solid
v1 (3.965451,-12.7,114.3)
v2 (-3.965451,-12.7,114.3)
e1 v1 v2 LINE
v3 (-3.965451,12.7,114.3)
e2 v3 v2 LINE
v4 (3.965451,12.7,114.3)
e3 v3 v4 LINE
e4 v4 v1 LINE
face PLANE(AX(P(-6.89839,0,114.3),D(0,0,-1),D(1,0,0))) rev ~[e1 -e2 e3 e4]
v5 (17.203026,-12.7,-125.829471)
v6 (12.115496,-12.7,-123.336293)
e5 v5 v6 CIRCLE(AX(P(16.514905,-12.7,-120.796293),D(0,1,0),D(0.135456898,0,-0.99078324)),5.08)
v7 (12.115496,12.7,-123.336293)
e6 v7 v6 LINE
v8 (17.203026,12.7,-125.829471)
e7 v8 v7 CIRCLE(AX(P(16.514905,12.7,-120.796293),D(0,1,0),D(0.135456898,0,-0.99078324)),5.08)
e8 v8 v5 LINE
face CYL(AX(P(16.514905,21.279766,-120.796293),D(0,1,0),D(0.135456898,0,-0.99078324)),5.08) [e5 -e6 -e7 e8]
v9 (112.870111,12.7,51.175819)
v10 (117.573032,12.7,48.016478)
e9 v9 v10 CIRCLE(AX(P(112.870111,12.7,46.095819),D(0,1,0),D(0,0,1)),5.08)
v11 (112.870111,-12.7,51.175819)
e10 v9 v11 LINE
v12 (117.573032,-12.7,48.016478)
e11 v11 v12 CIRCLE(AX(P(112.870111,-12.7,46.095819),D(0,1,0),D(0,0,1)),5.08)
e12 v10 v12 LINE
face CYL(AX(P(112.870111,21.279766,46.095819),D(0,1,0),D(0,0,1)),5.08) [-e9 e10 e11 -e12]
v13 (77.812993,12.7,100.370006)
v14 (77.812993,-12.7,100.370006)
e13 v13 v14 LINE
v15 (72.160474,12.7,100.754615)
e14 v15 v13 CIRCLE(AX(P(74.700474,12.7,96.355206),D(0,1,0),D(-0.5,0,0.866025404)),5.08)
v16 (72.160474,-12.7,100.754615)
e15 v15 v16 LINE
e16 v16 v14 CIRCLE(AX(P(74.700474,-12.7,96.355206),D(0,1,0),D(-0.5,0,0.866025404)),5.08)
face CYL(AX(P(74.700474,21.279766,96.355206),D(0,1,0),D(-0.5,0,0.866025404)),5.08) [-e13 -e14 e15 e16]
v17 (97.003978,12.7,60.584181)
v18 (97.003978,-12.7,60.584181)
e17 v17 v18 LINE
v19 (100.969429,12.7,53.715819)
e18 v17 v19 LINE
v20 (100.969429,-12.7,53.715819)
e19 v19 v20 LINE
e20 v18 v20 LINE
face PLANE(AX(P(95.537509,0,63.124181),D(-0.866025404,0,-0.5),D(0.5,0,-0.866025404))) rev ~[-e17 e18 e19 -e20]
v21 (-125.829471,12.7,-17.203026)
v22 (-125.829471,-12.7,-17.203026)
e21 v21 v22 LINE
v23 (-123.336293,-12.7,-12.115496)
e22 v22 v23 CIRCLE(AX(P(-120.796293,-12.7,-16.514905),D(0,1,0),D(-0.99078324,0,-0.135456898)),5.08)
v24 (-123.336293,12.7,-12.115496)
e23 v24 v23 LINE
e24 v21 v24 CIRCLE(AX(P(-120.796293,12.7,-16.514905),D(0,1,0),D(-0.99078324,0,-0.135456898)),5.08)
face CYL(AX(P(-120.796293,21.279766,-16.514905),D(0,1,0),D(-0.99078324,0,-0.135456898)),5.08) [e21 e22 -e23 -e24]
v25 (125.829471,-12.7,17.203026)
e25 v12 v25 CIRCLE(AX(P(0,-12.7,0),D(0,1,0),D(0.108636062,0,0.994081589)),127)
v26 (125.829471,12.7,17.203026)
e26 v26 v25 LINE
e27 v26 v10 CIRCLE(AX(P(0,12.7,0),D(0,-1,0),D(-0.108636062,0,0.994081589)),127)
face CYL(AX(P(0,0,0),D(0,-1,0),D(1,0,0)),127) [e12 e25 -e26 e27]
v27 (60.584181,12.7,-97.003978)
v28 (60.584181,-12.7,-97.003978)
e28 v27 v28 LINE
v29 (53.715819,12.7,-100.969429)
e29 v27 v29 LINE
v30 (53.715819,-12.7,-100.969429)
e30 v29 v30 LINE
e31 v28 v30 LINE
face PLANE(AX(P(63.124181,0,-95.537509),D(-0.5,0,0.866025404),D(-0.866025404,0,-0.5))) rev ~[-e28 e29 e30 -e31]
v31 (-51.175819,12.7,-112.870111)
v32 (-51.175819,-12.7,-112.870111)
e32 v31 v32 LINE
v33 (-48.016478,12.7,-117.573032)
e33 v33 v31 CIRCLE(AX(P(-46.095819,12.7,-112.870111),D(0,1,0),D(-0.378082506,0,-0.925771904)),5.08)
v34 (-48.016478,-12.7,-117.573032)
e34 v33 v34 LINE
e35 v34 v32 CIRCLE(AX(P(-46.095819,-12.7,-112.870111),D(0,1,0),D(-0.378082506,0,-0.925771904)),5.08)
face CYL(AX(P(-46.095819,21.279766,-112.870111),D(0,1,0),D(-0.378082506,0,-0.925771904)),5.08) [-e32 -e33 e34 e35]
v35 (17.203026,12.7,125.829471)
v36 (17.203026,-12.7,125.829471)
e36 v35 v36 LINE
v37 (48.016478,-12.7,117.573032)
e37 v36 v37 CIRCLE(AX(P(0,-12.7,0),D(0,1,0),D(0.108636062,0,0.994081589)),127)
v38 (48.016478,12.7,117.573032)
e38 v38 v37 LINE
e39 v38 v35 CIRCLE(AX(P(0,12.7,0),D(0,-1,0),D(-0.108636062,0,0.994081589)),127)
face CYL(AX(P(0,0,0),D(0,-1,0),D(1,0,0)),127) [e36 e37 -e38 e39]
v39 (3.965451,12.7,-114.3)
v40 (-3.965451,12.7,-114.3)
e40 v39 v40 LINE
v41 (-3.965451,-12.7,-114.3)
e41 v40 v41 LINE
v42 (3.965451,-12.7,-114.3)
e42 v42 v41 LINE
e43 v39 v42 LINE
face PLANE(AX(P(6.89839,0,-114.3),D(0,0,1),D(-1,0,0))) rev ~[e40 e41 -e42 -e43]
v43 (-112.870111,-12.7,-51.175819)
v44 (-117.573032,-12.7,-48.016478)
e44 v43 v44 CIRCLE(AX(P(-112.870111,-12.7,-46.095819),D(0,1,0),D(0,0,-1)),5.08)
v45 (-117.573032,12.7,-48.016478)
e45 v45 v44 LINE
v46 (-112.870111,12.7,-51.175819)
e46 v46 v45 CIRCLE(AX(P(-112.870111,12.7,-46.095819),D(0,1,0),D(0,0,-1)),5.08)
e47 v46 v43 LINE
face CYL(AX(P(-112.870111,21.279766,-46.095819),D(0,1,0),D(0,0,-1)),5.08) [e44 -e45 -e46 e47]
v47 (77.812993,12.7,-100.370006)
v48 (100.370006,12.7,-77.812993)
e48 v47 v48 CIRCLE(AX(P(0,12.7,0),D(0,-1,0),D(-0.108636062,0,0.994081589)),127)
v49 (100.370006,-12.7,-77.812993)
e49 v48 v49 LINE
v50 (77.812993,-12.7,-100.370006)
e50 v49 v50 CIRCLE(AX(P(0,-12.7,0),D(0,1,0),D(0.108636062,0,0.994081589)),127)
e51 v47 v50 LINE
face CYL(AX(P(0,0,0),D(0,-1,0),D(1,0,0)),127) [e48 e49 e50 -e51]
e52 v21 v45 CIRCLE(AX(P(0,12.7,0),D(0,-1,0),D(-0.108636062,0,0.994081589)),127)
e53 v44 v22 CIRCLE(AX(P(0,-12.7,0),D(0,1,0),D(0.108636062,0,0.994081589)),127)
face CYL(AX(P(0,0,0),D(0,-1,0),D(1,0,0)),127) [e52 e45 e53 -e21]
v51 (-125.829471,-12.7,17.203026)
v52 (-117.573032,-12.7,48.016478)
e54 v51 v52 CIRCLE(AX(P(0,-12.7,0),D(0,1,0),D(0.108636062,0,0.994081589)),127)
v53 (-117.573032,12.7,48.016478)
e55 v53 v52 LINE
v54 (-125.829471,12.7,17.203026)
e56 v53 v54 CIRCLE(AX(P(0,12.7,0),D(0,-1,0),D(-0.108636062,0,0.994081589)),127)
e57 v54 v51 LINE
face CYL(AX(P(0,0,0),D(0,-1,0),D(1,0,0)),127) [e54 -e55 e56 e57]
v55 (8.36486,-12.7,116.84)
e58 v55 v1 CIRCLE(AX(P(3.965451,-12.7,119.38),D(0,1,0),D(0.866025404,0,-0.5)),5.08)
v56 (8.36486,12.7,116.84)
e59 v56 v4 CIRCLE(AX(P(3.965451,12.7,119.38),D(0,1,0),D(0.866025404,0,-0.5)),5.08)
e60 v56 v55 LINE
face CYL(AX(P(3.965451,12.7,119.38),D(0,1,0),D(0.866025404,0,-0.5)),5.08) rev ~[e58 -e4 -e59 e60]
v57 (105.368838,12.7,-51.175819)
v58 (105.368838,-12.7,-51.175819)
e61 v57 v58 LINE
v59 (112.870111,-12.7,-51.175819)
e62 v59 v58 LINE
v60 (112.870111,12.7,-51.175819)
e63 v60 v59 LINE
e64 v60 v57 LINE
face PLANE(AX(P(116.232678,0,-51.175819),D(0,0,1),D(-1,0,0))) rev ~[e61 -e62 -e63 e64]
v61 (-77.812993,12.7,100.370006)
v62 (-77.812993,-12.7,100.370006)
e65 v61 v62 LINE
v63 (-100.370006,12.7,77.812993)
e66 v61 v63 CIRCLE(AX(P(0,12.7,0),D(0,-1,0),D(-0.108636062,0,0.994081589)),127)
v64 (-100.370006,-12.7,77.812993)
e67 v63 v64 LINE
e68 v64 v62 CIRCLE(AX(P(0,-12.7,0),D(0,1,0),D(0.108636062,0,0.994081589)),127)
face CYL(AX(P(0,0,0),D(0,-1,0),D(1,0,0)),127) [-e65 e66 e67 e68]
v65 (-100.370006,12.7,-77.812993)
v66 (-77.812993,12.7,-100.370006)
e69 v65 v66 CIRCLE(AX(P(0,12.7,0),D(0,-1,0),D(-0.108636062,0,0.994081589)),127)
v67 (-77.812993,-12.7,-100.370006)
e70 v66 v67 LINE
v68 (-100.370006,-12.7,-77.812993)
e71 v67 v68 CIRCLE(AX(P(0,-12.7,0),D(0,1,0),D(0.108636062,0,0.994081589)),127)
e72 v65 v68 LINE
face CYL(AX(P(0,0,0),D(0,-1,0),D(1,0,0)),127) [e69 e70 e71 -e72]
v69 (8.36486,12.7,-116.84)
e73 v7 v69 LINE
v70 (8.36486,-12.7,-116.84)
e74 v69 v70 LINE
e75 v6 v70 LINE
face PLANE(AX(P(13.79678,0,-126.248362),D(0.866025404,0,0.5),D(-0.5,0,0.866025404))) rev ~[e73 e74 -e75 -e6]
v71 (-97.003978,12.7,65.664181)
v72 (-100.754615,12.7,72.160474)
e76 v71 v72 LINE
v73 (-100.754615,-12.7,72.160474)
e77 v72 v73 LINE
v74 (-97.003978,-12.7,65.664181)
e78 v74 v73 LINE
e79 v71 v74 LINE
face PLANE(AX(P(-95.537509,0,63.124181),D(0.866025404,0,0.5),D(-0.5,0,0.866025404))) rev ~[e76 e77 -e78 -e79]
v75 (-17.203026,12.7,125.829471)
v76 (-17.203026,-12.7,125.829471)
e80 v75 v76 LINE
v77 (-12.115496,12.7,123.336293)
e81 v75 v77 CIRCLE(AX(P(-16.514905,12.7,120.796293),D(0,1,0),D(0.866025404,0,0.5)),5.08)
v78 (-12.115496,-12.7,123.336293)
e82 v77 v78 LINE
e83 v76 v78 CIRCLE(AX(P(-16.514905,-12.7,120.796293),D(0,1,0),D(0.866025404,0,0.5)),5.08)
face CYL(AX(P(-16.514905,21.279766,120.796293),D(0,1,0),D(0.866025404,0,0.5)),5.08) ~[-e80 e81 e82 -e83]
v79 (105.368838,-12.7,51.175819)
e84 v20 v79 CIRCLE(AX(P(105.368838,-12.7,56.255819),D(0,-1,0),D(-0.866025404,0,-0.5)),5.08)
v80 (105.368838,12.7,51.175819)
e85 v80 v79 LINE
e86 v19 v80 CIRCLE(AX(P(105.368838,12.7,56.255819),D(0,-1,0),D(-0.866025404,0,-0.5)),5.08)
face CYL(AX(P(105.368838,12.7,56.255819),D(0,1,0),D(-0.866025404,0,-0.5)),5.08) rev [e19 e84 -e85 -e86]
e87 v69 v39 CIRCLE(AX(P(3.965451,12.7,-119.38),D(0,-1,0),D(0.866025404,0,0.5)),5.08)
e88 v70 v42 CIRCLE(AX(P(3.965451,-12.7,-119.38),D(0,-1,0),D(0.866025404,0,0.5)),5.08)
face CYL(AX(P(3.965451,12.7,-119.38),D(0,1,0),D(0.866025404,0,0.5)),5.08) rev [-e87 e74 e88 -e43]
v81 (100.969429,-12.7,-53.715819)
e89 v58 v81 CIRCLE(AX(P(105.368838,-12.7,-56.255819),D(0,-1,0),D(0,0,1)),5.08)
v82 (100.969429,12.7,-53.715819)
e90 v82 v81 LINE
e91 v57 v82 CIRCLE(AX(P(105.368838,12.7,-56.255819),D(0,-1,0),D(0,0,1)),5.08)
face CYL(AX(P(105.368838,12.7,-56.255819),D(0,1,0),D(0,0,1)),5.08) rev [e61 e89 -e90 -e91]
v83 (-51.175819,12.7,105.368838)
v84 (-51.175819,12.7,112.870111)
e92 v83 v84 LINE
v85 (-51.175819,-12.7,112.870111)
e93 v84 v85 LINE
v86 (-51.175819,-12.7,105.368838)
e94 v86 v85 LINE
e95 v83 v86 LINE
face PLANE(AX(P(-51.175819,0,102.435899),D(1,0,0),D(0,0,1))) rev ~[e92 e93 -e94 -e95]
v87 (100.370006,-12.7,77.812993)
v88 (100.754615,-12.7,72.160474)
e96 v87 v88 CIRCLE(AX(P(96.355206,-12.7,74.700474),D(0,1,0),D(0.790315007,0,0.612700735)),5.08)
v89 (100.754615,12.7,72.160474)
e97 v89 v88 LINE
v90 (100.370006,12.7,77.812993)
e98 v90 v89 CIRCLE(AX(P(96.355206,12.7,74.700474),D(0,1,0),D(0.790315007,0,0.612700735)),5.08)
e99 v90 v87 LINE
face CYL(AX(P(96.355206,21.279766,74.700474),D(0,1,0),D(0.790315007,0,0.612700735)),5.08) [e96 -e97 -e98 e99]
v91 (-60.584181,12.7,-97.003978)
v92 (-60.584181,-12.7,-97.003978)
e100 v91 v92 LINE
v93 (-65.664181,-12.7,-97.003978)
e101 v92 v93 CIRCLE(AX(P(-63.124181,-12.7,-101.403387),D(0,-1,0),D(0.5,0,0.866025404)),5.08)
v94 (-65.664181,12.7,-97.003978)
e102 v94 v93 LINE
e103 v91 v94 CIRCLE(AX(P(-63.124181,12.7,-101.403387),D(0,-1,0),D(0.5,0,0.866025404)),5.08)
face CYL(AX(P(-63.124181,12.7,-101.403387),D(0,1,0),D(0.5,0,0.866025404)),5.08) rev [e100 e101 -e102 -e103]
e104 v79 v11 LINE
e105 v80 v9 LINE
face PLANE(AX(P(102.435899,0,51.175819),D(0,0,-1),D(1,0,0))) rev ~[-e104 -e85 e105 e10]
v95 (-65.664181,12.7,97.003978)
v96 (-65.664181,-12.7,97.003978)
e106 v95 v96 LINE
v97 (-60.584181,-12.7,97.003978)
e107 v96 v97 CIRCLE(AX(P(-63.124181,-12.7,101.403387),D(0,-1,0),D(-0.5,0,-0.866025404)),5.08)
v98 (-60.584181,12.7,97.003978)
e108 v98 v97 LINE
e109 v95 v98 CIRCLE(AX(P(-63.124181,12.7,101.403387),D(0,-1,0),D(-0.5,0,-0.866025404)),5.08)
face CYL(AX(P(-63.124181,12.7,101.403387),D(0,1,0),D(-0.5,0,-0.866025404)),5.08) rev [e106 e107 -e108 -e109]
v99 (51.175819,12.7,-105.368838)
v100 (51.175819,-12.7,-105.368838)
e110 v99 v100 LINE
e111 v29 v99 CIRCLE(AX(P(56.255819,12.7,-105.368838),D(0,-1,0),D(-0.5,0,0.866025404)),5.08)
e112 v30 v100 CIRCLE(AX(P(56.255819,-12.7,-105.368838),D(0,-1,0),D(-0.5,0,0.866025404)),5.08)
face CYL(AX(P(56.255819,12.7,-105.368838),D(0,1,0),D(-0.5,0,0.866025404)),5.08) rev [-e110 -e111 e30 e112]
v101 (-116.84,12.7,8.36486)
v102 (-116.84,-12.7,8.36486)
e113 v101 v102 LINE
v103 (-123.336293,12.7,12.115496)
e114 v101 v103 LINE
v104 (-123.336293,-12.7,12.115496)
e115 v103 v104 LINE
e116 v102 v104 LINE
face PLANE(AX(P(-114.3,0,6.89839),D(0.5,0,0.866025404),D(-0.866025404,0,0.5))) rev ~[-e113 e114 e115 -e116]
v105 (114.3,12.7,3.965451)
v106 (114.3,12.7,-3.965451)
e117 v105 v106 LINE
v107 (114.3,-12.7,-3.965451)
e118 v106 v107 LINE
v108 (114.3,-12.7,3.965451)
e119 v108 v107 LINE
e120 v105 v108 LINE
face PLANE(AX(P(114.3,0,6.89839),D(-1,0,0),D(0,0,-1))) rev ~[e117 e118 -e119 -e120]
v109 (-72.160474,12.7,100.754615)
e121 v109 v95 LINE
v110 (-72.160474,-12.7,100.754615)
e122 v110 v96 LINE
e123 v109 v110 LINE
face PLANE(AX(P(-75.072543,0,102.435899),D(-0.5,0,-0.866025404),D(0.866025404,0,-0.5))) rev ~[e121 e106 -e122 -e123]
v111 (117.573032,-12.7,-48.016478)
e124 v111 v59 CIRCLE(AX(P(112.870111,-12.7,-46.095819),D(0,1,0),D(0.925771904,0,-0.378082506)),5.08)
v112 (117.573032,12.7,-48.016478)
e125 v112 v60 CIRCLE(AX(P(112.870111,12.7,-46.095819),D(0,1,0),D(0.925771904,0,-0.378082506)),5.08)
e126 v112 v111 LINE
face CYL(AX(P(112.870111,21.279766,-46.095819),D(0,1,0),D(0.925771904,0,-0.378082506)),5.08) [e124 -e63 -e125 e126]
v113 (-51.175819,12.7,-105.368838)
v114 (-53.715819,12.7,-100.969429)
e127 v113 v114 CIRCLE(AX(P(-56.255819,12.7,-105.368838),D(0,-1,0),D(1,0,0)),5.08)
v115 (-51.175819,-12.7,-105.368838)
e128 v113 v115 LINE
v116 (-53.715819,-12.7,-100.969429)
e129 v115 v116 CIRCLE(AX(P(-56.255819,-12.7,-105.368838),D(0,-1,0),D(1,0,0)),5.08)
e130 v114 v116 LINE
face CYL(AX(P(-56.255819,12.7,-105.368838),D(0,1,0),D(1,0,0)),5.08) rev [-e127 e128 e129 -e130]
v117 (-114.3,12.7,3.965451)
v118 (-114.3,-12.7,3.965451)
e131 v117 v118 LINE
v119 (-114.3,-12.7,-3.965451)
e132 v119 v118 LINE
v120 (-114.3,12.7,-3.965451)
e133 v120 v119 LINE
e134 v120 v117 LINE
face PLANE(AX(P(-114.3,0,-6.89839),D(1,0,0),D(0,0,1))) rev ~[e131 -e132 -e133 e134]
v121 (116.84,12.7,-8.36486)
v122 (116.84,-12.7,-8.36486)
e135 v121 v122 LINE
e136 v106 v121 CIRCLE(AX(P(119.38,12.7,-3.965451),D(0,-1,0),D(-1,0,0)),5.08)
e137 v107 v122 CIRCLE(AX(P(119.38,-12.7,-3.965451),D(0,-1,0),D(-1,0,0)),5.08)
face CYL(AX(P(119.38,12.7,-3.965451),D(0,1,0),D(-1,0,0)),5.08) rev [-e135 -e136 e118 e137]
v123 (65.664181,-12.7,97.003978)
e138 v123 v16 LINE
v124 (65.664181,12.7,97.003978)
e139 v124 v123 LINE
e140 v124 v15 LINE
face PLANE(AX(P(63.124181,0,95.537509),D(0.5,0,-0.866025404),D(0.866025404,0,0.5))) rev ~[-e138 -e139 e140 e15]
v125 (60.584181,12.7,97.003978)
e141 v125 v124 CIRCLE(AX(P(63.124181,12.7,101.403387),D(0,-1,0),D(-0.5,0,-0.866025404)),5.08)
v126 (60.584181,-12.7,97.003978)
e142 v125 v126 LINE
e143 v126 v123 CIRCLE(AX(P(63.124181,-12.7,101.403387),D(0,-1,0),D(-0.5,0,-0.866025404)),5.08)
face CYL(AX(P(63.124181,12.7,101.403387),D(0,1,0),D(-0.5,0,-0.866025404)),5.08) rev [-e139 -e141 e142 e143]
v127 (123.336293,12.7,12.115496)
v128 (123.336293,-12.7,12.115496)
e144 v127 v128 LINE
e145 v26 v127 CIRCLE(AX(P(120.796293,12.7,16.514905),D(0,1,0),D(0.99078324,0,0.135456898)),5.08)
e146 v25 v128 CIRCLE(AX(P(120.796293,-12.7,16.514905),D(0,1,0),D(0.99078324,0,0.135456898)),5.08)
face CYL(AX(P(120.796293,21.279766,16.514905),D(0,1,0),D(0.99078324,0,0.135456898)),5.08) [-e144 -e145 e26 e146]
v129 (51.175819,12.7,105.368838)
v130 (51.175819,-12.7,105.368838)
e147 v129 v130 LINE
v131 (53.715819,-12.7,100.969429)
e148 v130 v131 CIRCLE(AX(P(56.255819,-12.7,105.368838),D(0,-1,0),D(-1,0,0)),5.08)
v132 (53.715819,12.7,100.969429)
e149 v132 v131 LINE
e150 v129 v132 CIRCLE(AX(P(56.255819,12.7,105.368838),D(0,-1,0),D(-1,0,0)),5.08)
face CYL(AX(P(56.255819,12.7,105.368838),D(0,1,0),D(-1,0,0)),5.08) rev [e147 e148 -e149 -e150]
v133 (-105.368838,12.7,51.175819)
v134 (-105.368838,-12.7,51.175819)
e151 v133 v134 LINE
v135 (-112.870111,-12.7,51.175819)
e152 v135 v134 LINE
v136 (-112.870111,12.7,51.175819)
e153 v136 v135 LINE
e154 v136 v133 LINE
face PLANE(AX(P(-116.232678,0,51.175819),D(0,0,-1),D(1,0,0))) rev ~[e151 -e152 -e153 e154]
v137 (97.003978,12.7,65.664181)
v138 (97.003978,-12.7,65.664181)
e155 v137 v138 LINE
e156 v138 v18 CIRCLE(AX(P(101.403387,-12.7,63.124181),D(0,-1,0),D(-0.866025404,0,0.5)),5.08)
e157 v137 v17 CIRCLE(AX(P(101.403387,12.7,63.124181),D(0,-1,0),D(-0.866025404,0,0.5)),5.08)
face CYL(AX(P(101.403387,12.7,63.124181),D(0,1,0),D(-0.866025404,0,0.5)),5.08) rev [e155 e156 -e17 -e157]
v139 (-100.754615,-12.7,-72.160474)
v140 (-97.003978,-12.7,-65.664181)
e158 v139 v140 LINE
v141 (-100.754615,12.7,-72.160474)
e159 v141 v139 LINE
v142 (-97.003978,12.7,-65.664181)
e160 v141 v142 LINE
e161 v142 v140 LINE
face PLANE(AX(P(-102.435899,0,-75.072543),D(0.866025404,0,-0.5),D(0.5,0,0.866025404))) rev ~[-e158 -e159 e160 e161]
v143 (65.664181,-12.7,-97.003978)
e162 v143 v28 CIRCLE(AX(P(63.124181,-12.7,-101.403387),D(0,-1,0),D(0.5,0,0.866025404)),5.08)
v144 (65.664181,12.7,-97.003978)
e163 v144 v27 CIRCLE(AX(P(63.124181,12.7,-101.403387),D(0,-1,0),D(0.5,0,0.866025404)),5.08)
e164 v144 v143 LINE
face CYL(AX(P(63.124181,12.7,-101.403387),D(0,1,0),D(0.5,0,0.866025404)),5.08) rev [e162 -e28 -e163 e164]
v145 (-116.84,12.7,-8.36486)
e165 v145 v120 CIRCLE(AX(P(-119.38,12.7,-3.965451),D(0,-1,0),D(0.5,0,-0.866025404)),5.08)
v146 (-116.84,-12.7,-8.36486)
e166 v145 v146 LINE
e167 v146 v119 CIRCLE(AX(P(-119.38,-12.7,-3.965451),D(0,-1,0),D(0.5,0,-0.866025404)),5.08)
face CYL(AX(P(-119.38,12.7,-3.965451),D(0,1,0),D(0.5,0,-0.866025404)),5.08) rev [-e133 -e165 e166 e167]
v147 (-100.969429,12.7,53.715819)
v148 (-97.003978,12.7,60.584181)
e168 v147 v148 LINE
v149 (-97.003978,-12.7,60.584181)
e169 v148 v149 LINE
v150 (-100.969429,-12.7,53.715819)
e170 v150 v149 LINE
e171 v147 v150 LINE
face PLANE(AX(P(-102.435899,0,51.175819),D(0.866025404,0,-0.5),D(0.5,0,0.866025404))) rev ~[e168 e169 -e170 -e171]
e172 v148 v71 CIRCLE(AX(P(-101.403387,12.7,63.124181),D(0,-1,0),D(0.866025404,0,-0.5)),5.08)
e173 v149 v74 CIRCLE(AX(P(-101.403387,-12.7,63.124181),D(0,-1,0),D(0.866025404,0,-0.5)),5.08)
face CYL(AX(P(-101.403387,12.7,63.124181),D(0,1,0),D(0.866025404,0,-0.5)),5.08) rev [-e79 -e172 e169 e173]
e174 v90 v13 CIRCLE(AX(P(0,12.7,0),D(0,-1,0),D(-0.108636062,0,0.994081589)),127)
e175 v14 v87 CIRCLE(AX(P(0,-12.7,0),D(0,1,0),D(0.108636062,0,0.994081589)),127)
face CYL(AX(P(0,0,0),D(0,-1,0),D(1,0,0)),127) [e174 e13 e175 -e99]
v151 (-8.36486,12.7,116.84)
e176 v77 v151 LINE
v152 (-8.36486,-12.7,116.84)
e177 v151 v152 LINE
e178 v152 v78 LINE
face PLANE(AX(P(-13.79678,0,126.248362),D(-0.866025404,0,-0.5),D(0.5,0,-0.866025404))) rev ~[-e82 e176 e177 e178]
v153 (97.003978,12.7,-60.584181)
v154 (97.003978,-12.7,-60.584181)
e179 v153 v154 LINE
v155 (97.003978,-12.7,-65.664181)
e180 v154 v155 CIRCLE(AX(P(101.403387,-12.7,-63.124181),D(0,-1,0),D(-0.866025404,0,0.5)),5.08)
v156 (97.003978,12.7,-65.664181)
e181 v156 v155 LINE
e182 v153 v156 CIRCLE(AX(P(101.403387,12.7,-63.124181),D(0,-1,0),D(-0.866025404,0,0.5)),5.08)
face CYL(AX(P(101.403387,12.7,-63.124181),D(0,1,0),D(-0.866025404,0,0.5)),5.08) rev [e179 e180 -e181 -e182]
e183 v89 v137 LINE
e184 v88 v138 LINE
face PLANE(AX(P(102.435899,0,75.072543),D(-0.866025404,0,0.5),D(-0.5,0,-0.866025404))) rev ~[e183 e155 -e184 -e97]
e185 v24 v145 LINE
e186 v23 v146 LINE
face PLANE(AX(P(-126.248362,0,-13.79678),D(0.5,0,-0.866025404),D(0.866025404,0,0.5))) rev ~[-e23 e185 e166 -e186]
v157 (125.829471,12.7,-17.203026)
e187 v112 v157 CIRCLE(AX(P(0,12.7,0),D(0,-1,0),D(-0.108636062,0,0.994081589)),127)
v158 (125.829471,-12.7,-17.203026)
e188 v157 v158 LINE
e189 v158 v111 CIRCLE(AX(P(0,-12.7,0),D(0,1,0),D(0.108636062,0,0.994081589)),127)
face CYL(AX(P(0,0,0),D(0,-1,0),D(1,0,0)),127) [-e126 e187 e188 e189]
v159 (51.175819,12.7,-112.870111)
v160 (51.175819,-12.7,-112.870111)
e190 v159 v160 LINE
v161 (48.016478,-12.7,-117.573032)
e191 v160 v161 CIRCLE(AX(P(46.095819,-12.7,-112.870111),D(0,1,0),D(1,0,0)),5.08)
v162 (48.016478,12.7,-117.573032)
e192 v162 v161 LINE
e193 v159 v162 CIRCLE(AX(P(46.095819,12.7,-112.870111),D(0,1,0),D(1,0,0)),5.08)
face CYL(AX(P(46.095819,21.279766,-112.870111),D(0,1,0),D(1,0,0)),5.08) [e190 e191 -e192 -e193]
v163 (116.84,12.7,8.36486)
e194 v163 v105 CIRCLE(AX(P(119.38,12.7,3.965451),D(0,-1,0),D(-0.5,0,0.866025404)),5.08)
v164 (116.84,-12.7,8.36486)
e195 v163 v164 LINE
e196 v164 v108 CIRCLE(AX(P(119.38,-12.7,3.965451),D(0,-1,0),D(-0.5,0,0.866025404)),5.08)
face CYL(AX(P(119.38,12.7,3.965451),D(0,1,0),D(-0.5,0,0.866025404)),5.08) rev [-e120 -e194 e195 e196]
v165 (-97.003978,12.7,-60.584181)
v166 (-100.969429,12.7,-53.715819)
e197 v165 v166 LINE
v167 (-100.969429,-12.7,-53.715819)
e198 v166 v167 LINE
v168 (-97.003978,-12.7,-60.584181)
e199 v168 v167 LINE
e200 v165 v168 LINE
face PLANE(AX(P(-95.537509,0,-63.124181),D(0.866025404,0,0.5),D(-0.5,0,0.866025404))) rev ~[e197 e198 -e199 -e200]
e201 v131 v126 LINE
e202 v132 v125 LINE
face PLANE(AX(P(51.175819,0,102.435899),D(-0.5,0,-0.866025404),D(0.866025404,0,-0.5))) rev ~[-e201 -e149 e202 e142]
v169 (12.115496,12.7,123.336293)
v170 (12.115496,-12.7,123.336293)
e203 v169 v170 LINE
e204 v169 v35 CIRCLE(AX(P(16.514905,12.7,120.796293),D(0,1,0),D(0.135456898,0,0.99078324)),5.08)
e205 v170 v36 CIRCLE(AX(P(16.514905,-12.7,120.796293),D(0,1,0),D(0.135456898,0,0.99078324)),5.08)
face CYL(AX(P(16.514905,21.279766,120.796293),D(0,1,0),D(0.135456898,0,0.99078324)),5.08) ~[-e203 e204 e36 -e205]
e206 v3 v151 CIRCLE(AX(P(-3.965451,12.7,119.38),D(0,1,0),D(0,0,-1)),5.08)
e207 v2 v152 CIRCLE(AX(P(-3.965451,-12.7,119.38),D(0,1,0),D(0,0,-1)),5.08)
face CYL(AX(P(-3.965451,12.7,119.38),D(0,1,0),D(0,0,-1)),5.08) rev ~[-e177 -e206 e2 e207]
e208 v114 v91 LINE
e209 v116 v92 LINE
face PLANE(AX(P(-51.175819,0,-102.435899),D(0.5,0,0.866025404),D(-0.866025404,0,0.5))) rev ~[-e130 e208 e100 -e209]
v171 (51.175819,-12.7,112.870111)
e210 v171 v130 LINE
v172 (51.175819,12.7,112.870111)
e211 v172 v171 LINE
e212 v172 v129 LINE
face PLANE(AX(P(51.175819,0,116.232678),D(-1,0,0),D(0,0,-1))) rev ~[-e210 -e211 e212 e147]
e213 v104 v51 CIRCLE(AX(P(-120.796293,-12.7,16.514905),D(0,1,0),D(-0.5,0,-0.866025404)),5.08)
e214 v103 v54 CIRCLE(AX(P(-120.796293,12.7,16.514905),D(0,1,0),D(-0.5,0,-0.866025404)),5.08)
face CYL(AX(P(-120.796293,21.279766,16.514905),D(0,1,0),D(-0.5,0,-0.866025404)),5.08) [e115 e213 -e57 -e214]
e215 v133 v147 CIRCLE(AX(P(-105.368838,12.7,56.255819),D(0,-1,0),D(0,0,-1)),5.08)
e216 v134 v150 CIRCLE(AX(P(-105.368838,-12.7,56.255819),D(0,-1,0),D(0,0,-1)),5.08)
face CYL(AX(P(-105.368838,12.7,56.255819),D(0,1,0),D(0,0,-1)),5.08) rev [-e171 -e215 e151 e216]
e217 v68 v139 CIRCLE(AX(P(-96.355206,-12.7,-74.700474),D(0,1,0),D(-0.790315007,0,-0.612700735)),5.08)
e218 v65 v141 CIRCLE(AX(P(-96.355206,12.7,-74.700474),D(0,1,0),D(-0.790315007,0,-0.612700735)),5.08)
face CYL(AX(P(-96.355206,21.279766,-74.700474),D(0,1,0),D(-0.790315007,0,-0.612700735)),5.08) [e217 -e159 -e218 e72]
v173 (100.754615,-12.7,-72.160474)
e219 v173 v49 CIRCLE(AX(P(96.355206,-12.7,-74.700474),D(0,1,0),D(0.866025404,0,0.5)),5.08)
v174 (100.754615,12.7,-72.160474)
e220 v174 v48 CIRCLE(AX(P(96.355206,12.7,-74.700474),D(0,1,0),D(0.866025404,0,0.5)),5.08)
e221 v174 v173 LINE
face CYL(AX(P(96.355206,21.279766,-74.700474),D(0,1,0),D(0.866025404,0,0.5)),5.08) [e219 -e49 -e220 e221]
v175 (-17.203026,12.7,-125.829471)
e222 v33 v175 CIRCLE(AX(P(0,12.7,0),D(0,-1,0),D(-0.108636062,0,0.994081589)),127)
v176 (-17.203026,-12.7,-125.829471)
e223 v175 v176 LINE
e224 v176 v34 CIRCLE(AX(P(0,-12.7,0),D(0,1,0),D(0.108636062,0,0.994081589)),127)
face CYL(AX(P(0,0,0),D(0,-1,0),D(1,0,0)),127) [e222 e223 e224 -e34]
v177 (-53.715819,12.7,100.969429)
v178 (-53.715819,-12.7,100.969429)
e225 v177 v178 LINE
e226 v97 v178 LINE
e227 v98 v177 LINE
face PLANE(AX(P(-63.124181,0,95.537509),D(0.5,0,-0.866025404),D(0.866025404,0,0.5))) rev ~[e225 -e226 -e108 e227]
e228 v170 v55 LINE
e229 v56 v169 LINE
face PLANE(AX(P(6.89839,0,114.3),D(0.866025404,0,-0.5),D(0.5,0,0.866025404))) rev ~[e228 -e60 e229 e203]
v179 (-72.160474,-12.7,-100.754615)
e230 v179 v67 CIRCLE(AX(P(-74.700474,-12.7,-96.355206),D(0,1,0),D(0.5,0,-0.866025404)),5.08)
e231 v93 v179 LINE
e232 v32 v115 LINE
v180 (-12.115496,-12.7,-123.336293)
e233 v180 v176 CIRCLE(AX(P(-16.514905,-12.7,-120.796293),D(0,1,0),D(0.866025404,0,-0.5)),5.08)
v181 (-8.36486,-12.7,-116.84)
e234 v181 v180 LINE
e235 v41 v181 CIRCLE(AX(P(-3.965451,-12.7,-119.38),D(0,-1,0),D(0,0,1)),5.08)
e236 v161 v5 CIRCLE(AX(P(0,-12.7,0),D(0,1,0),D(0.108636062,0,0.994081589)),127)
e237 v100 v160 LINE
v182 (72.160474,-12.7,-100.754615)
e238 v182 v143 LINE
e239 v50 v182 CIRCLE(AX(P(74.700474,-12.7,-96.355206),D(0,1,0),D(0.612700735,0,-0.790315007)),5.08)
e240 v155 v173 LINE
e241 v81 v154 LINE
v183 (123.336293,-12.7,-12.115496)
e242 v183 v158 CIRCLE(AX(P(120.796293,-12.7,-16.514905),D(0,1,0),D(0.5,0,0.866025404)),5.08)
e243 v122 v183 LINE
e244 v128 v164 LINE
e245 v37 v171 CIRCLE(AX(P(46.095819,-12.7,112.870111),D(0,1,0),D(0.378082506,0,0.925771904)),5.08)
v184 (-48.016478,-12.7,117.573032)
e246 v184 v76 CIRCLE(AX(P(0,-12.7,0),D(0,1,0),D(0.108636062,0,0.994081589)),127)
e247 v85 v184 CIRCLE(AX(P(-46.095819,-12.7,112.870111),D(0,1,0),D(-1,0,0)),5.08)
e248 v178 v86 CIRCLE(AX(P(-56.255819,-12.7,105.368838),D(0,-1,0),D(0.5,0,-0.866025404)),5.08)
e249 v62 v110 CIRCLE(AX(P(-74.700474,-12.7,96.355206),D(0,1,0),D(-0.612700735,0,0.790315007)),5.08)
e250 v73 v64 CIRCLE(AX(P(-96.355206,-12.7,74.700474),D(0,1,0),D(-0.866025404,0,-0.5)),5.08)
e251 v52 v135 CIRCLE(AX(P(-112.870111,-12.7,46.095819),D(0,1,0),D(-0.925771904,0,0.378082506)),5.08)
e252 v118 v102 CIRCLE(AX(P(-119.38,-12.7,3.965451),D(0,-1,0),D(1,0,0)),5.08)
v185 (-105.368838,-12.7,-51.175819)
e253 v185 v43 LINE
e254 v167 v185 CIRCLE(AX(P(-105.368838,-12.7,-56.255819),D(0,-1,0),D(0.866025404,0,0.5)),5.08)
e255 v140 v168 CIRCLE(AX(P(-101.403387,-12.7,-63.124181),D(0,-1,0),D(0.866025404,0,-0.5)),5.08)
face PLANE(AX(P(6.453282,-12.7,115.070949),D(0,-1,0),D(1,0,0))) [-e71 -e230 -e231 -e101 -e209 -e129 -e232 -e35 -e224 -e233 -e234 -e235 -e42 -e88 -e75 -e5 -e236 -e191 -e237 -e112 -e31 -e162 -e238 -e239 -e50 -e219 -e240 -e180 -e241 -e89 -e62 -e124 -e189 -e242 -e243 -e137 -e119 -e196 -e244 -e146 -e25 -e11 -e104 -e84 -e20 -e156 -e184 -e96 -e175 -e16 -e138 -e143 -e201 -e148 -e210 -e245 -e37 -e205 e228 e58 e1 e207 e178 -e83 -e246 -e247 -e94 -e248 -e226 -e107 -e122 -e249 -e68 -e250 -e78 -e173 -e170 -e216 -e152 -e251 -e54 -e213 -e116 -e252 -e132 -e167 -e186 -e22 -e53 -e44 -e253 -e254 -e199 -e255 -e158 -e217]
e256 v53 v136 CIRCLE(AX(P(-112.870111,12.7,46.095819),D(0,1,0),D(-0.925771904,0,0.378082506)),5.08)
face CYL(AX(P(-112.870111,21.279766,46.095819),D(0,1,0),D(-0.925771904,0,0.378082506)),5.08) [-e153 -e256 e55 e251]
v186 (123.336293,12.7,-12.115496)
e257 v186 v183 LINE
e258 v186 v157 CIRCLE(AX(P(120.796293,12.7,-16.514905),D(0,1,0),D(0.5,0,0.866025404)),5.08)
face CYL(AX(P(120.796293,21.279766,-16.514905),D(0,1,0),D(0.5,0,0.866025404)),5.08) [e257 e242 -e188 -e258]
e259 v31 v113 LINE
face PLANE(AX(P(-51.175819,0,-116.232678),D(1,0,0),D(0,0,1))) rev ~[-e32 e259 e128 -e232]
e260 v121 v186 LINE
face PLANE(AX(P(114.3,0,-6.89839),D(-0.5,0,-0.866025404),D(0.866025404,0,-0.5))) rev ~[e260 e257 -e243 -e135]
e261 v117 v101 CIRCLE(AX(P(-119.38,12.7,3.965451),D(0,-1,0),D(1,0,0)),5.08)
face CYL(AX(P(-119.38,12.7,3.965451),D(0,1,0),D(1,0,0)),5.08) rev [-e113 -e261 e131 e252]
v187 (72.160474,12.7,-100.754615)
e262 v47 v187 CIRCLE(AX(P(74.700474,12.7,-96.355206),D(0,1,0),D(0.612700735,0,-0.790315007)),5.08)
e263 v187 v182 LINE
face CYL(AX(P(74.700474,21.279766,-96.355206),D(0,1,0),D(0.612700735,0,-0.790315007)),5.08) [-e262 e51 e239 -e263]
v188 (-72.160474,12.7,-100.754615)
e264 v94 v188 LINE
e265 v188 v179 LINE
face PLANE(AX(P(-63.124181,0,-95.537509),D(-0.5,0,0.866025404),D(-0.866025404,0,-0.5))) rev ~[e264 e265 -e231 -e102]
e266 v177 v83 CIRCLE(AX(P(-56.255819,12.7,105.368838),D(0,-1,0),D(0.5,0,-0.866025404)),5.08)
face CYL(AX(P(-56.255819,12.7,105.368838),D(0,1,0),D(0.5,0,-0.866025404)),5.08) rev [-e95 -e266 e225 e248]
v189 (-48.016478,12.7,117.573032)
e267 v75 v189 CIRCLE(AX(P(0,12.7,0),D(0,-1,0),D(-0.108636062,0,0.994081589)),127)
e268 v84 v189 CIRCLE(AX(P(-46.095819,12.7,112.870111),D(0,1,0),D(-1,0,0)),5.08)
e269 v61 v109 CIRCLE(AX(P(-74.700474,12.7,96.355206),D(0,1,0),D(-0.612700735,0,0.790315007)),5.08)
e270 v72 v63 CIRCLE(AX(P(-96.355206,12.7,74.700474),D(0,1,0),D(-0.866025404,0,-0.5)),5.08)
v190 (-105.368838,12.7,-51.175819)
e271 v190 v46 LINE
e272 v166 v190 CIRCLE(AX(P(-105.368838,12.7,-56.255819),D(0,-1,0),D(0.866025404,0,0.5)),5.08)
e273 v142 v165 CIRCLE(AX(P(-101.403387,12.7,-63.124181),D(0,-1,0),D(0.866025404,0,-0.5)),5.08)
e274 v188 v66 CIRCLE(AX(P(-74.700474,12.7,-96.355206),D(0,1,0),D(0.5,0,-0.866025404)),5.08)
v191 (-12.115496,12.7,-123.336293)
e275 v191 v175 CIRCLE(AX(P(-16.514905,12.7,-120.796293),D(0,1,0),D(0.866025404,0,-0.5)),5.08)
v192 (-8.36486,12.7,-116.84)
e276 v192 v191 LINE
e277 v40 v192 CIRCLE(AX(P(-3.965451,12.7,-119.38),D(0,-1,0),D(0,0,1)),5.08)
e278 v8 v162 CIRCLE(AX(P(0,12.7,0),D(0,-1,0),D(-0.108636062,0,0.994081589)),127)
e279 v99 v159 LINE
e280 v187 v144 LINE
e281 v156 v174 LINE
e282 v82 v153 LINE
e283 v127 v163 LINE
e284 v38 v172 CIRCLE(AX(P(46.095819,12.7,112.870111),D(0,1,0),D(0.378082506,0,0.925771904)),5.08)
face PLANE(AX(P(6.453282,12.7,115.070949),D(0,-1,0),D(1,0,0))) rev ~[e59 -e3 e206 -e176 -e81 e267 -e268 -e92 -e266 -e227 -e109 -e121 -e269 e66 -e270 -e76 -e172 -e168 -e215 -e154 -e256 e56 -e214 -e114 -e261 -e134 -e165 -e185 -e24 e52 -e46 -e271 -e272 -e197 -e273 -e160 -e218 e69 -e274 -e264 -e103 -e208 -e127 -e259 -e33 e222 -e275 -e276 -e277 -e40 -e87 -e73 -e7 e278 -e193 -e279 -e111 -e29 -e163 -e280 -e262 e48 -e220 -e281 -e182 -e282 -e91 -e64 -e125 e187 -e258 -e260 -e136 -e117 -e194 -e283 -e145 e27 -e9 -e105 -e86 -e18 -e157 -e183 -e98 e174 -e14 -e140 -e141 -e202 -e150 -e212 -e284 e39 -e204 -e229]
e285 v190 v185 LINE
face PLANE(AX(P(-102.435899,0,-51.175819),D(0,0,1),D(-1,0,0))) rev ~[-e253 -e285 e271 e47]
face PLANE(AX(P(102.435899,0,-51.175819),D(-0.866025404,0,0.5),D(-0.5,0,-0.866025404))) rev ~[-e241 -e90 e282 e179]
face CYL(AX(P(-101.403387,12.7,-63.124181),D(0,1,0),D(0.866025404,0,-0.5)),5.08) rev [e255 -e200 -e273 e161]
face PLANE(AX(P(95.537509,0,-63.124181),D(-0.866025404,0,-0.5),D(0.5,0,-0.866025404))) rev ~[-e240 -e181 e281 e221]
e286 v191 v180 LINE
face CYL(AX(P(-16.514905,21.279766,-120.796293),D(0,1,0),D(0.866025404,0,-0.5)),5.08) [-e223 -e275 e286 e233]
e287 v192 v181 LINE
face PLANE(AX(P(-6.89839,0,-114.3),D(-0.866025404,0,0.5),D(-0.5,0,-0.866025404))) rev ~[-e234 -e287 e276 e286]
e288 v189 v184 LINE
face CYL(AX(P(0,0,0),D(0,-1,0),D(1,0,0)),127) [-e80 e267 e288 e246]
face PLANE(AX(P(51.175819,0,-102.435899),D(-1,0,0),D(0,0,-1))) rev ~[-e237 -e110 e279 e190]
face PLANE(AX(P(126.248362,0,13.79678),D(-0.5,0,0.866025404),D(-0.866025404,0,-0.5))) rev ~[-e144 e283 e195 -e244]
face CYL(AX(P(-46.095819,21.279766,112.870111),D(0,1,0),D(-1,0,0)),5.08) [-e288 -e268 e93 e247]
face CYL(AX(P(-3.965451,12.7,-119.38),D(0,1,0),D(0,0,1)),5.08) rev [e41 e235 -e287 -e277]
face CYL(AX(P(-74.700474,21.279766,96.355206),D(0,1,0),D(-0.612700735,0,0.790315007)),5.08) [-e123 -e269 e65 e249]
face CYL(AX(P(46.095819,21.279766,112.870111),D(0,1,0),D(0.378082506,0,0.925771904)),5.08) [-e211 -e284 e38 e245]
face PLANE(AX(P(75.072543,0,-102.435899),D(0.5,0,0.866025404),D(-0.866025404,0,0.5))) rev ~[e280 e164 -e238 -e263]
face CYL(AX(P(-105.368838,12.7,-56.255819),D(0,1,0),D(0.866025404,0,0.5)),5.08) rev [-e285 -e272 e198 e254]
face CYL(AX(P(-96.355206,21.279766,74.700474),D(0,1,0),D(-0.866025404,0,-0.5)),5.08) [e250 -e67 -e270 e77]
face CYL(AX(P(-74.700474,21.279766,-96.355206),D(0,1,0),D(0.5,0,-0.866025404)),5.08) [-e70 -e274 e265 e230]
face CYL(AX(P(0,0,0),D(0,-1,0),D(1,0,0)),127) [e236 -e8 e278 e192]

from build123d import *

# Parameters (mm, degrees)
F0_R            = 127
F1_DEPTH        = 12.7
F3_DEPTH        = 12.701
F3_DEPTH_BACK   = 12.701
F3_COPIES_COUNT = 12
F4_T1_DEPTH     = 25.4
F4_T3_DEPTH     = 42.5595323233


# Not quite as in the source:
# - a fillet or chamfer that OpenCascade refuses, or shapes differently, is made with other operations: its cross-section is extruded or revolved along the edge and cut away or added
# - a feature of the source that left no trace in its solid (it failed there, or was rolled back) is left out
# - a pattern or mirror of a feature is missing from the dataset's text; its kind, count and spacing are read off the source's solid


with BuildPart() as f1:
    # F0 (on Front) → F1 (new body, symmetric)
    with BuildSketch(Plane.XZ):
        Circle(F0_R)
    extrude(amount=F1_DEPTH, both=True)

    # F2 (on Front) → F3 (cut, two sides)
    with BuildSketch(Plane.XZ) as f3_sk:
        with BuildLine():
            Line((0, 114.3), (6.8983899217, 114.3))
            Line((6.8983899217, 114.3), (13.7967798433, 126.2483618347))
            ThreePointArc((13.7967798433, 126.2483618347), (0, 127), (-13.7967798433, 126.2483618347))
            Line((-13.7967798433, 126.2483618347), (-6.8983899217, 114.3))
            Line((-6.8983899217, 114.3), (0, 114.3))
        make_face()
    f3 = extrude(amount=-F3_DEPTH, mode=Mode.SUBTRACT) + extrude(f3_sk.sketch, amount=F3_DEPTH_BACK, mode=Mode.SUBTRACT)

    # F3_copies: F3 ×12 about axis
    f3_copies_axis = Axis((0, 0, 0), (0, 1, 0))
    for i in range(1, F3_COPIES_COUNT):
        add(f3.rotate(f3_copies_axis, i * 360 / F3_COPIES_COUNT), mode=Mode.SUBTRACT)

    # F4: fillet of radius 5.08 on 48 edges, made by hand

    # F4_s2 → F4_t1 (join)
    with BuildSketch(Plane.XZ.offset(-12.7)):
        with BuildLine():
            ThreePointArc((8.3648596054, 116.84), (6.5054505542, 114.9805909488), (3.9654505542, 114.3))
            Line((3.9654505542, 114.3), (6.8983899217, 114.3))
            Line((6.8983899217, 114.3), (8.3648596054, 116.84))
        make_face()
        with BuildLine():
            ThreePointArc((-3.9654505542, 114.3), (-6.5054505542, 114.9805909488), (-8.3648596054, 116.84))
            Line((-8.3648596054, 116.84), (-6.8983899217, 114.3))
            Line((-6.8983899217, 114.3), (-3.9654505542, 114.3))
        make_face()
        with BuildLine():
            ThreePointArc((51.1758190826, 105.3688379809), (51.8564100314, 102.8288379809), (53.7158190826, 100.9694289297))
            Line((53.7158190826, 100.9694289297), (51.1758190826, 102.4358986134))
            Line((51.1758190826, 102.4358986134), (51.1758190826, 105.3688379809))
        make_face()
        with BuildLine():
            ThreePointArc((60.5841809174, 97.0039783755), (63.1241809174, 96.3233874267), (65.6641809174, 97.0039783755))
            Line((65.6641809174, 97.0039783755), (63.1241809174, 95.5375086917))
            Line((63.1241809174, 95.5375086917), (60.5841809174, 97.0039783755))
        make_face()
        with BuildLine():
            ThreePointArc((97.0039783755, 65.6641809174), (96.3233874267, 63.1241809174), (97.0039783755, 60.5841809174))
            Line((97.0039783755, 60.5841809174), (95.5375086917, 63.1241809174))
            Line((95.5375086917, 63.1241809174), (97.0039783755, 65.6641809174))
        make_face()
        with BuildLine():
            ThreePointArc((100.9694289297, 53.7158190826), (102.8288379809, 51.8564100314), (105.3688379809, 51.1758190826))
            Line((105.3688379809, 51.1758190826), (102.4358986134, 51.1758190826))
            Line((102.4358986134, 51.1758190826), (100.9694289297, 53.7158190826))
        make_face()
        with BuildLine():
            ThreePointArc((116.84, 8.3648596054), (114.9805909488, 6.5054505542), (114.3, 3.9654505542))
            Line((114.3, 3.9654505542), (114.3, 6.8983899217))
            Line((114.3, 6.8983899217), (116.84, 8.3648596054))
        make_face()
        with BuildLine():
            ThreePointArc((114.3, -3.9654505542), (114.9805909488, -6.5054505542), (116.84, -8.3648596054))
            Line((116.84, -8.3648596054), (114.3, -6.8983899217))
            Line((114.3, -6.8983899217), (114.3, -3.9654505542))
        make_face()
        with BuildLine():
            ThreePointArc((105.3688379809, -51.1758190826), (102.8288379809, -51.8564100314), (100.9694289297, -53.7158190826))
            Line((100.9694289297, -53.7158190826), (102.4358986134, -51.1758190826))
            Line((102.4358986134, -51.1758190826), (105.3688379809, -51.1758190826))
        make_face()
        with BuildLine():
            ThreePointArc((97.0039783755, -60.5841809174), (96.3233874267, -63.1241809174), (97.0039783755, -65.6641809174))
            Line((97.0039783755, -65.6641809174), (95.5375086917, -63.1241809174))
            Line((95.5375086917, -63.1241809174), (97.0039783755, -60.5841809174))
        make_face()
        with BuildLine():
            ThreePointArc((65.6641809174, -97.0039783755), (63.1241809174, -96.3233874267), (60.5841809174, -97.0039783755))
            Line((60.5841809174, -97.0039783755), (63.1241809174, -95.5375086917))
            Line((63.1241809174, -95.5375086917), (65.6641809174, -97.0039783755))
        make_face()
        with BuildLine():
            ThreePointArc((53.7158190826, -100.9694289297), (51.8564100314, -102.8288379809), (51.1758190826, -105.3688379809))
            Line((51.1758190826, -105.3688379809), (51.1758190826, -102.4358986134))
            Line((51.1758190826, -102.4358986134), (53.7158190826, -100.9694289297))
        make_face()
        with BuildLine():
            ThreePointArc((8.3648596054, -116.84), (6.5054505542, -114.9805909488), (3.9654505542, -114.3))
            Line((3.9654505542, -114.3), (6.8983899217, -114.3))
            Line((6.8983899217, -114.3), (8.3648596054, -116.84))
        make_face()
        with BuildLine():
            ThreePointArc((-3.9654505542, -114.3), (-6.5054505542, -114.9805909488), (-8.3648596054, -116.84))
            Line((-8.3648596054, -116.84), (-6.8983899217, -114.3))
            Line((-6.8983899217, -114.3), (-3.9654505542, -114.3))
        make_face()
        with BuildLine():
            ThreePointArc((-51.1758190826, -105.3688379809), (-51.8564100314, -102.8288379809), (-53.7158190826, -100.9694289297))
            Line((-53.7158190826, -100.9694289297), (-51.1758190826, -102.4358986134))
            Line((-51.1758190826, -102.4358986134), (-51.1758190826, -105.3688379809))
        make_face()
        with BuildLine():
            ThreePointArc((-60.5841809174, -97.0039783755), (-63.1241809174, -96.3233874267), (-65.6641809174, -97.0039783755))
            Line((-65.6641809174, -97.0039783755), (-63.1241809174, -95.5375086917))
            Line((-63.1241809174, -95.5375086917), (-60.5841809174, -97.0039783755))
        make_face()
        with BuildLine():
            ThreePointArc((-97.0039783755, -65.6641809174), (-96.3233874267, -63.1241809174), (-97.0039783755, -60.5841809174))
            Line((-97.0039783755, -60.5841809174), (-95.5375086917, -63.1241809174))
            Line((-95.5375086917, -63.1241809174), (-97.0039783755, -65.6641809174))
        make_face()
        with BuildLine():
            ThreePointArc((-100.9694289297, -53.7158190826), (-102.8288379809, -51.8564100314), (-105.3688379809, -51.1758190826))
            Line((-105.3688379809, -51.1758190826), (-102.4358986134, -51.1758190826))
            Line((-102.4358986134, -51.1758190826), (-100.9694289297, -53.7158190826))
        make_face()
        with BuildLine():
            ThreePointArc((-116.84, -8.3648596054), (-114.9805909488, -6.5054505542), (-114.3, -3.9654505542))
            Line((-114.3, -3.9654505542), (-114.3, -6.8983899217))
            Line((-114.3, -6.8983899217), (-116.84, -8.3648596054))
        make_face()
        with BuildLine():
            ThreePointArc((-114.3, 3.9654505542), (-114.9805909488, 6.5054505542), (-116.84, 8.3648596054))
            Line((-116.84, 8.3648596054), (-114.3, 6.8983899217))
            Line((-114.3, 6.8983899217), (-114.3, 3.9654505542))
        make_face()
        with BuildLine():
            ThreePointArc((-105.3688379809, 51.1758190826), (-102.8288379809, 51.8564100314), (-100.9694289297, 53.7158190826))
            Line((-100.9694289297, 53.7158190826), (-102.4358986134, 51.1758190826))
            Line((-102.4358986134, 51.1758190826), (-105.3688379809, 51.1758190826))
        make_face()
        with BuildLine():
            ThreePointArc((-97.0039783755, 60.5841809174), (-96.3233874267, 63.1241809174), (-97.0039783755, 65.6641809174))
            Line((-97.0039783755, 65.6641809174), (-95.5375086917, 63.1241809174))
            Line((-95.5375086917, 63.1241809174), (-97.0039783755, 60.5841809174))
        make_face()
        with BuildLine():
            ThreePointArc((-65.6641809174, 97.0039783755), (-63.1241809174, 96.3233874267), (-60.5841809174, 97.0039783755))
            Line((-60.5841809174, 97.0039783755), (-63.1241809174, 95.5375086917))
            Line((-63.1241809174, 95.5375086917), (-65.6641809174, 97.0039783755))
        make_face()
        with BuildLine():
            ThreePointArc((-53.7158190826, 100.9694289297), (-51.8564100314, 102.8288379809), (-51.1758190826, 105.3688379809))
            Line((-51.1758190826, 105.3688379809), (-51.1758190826, 102.4358986134))
            Line((-51.1758190826, 102.4358986134), (-53.7158190826, 100.9694289297))
        make_face()
    extrude(amount=F4_T1_DEPTH)

    # F4_s4 → F4_t3 (cut)
    with BuildSketch(Plane.XZ.offset(-21.2797661616)):
        with BuildLine():
            ThreePointArc((17.2030259978, 125.8294714942), (14.2794184599, 125.3579809313), (12.1154959066, 123.3362926345))
            Line((12.1154959066, 123.3362926345), (13.7967798433, 126.2483618347))
            ThreePointArc((13.7967798433, 126.2483618347), (15.5013179384, 126.0504230147), (17.2030259978, 125.8294714942))
        make_face()
        with BuildLine():
            ThreePointArc((-12.1154959066, 123.3362926345), (-14.2794184599, 125.3579809313), (-17.2030259978, 125.8294714942))
            ThreePointArc((-17.2030259978, 125.8294714942), (-15.5013179384, 126.0504230147), (-13.7967798433, 126.2483618347))
            Line((-13.7967798433, 126.2483618347), (-12.1154959066, 123.3362926345))
        make_face()
        with BuildLine():
            ThreePointArc((48.0164782111, 117.5730318577), (50.3126513281, 115.7029052836), (51.1758190826, 112.8701105834))
            Line((51.1758190826, 112.8701105834), (51.1758190826, 116.2326784567))
            ThreePointArc((51.1758190826, 116.2326784567), (49.6006763806, 116.9135274576), (48.0164782111, 117.5730318577))
        make_face()
        with BuildLine():
            ThreePointArc((72.1604735518, 100.7546146767), (75.0453296032, 101.4234868237), (77.8129932832, 100.3700058599))
            ThreePointArc((77.8129932832, 100.3700058599), (76.4497466341, 101.4122095193), (75.0725427521, 102.4358986134))
            Line((75.0725427521, 102.4358986134), (72.1604735518, 100.7546146767))
        make_face()
        with BuildLine():
            ThreePointArc((100.3700058599, 77.8129932832), (101.4234868237, 75.0453296032), (100.7546146767, 72.1604735518))
            Line((100.7546146767, 72.1604735518), (102.4358986134, 75.0725427521))
            ThreePointArc((102.4358986134, 75.0725427521), (101.4122095193, 76.4497466341), (100.3700058599, 77.8129932832))
        make_face()
        with BuildLine():
            ThreePointArc((112.8701105834, 51.1758190826), (115.7029052836, 50.3126513281), (117.5730318577, 48.0164782111))
            ThreePointArc((117.5730318577, 48.0164782111), (116.9135274576, 49.6006763806), (116.2326784567, 51.1758190826))
            Line((116.2326784567, 51.1758190826), (112.8701105834, 51.1758190826))
        make_face()
        with BuildLine():
            ThreePointArc((125.8294714942, 17.2030259978), (125.3579809313, 14.2794184599), (123.3362926345, 12.1154959067))
            Line((123.3362926345, 12.1154959067), (126.2483618347, 13.7967798433))
            ThreePointArc((126.2483618347, 13.7967798433), (126.0504230147, 15.5013179384), (125.8294714942, 17.2030259978))
        make_face()
        with BuildLine():
            ThreePointArc((123.3362926345, -12.1154959066), (125.3579809313, -14.2794184599), (125.8294714942, -17.2030259978))
            ThreePointArc((125.8294714942, -17.2030259978), (126.0504230147, -15.5013179384), (126.2483618347, -13.7967798433))
            Line((126.2483618347, -13.7967798433), (123.3362926345, -12.1154959066))
        make_face()
        with BuildLine():
            ThreePointArc((117.5730318577, -48.0164782111), (115.7029052836, -50.3126513281), (112.8701105834, -51.1758190826))
            Line((112.8701105834, -51.1758190826), (116.2326784567, -51.1758190826))
            ThreePointArc((116.2326784567, -51.1758190826), (116.9135274576, -49.6006763806), (117.5730318577, -48.0164782111))
        make_face()
        with BuildLine():
            ThreePointArc((100.7546146767, -72.1604735518), (101.4234868237, -75.0453296032), (100.3700058599, -77.8129932832))
            ThreePointArc((100.3700058599, -77.8129932832), (101.4122095193, -76.4497466341), (102.4358986134, -75.0725427521))
            Line((102.4358986134, -75.0725427521), (100.7546146767, -72.1604735518))
        make_face()
        with BuildLine():
            ThreePointArc((77.8129932832, -100.3700058599), (75.0453296032, -101.4234868237), (72.1604735518, -100.7546146767))
            Line((72.1604735518, -100.7546146767), (75.0725427521, -102.4358986134))
            ThreePointArc((75.0725427521, -102.4358986134), (76.4497466341, -101.4122095193), (77.8129932832, -100.3700058599))
        make_face()
        with BuildLine():
            ThreePointArc((51.1758190826, -112.8701105834), (50.3126513281, -115.7029052836), (48.0164782111, -117.5730318577))
            ThreePointArc((48.0164782111, -117.5730318577), (49.6006763806, -116.9135274576), (51.1758190826, -116.2326784567))
            Line((51.1758190826, -116.2326784567), (51.1758190826, -112.8701105834))
        make_face()
        with BuildLine():
            ThreePointArc((17.2030259978, -125.8294714942), (14.2794184599, -125.3579809313), (12.1154959067, -123.3362926345))
            Line((12.1154959067, -123.3362926345), (13.7967798433, -126.2483618347))
            ThreePointArc((13.7967798433, -126.2483618347), (15.5013179384, -126.0504230147), (17.2030259978, -125.8294714942))
        make_face()
        with BuildLine():
            ThreePointArc((-12.1154959066, -123.3362926345), (-14.2794184599, -125.3579809313), (-17.2030259978, -125.8294714942))
            ThreePointArc((-17.2030259978, -125.8294714942), (-15.5013179384, -126.0504230147), (-13.7967798433, -126.2483618347))
            Line((-13.7967798433, -126.2483618347), (-12.1154959066, -123.3362926345))
        make_face()
        with BuildLine():
            ThreePointArc((-48.0164782111, -117.5730318577), (-50.3126513281, -115.7029052836), (-51.1758190826, -112.8701105834))
            Line((-51.1758190826, -112.8701105834), (-51.1758190826, -116.2326784567))
            ThreePointArc((-51.1758190826, -116.2326784567), (-49.6006763806, -116.9135274576), (-48.0164782111, -117.5730318577))
        make_face()
        with BuildLine():
            ThreePointArc((-72.1604735518, -100.7546146767), (-75.0453296032, -101.4234868237), (-77.8129932832, -100.3700058599))
            ThreePointArc((-77.8129932832, -100.3700058599), (-76.4497466341, -101.4122095193), (-75.0725427521, -102.4358986134))
            Line((-75.0725427521, -102.4358986134), (-72.1604735518, -100.7546146767))
        make_face()
        with BuildLine():
            ThreePointArc((-100.3700058599, -77.8129932832), (-101.4234868237, -75.0453296032), (-100.7546146767, -72.1604735518))
            Line((-100.7546146767, -72.1604735518), (-102.4358986134, -75.0725427521))
            ThreePointArc((-102.4358986134, -75.0725427521), (-101.4122095193, -76.4497466341), (-100.3700058599, -77.8129932832))
        make_face()
        with BuildLine():
            ThreePointArc((-112.8701105834, -51.1758190826), (-115.7029052836, -50.3126513281), (-117.5730318577, -48.0164782111))
            ThreePointArc((-117.5730318577, -48.0164782111), (-116.9135274576, -49.6006763806), (-116.2326784567, -51.1758190826))
            Line((-116.2326784567, -51.1758190826), (-112.8701105834, -51.1758190826))
        make_face()
        with BuildLine():
            ThreePointArc((-125.8294714942, -17.2030259978), (-125.3579809313, -14.2794184599), (-123.3362926345, -12.1154959066))
            Line((-123.3362926345, -12.1154959066), (-126.2483618347, -13.7967798433))
            ThreePointArc((-126.2483618347, -13.7967798433), (-126.0504230147, -15.5013179384), (-125.8294714942, -17.2030259978))
        make_face()
        with BuildLine():
            ThreePointArc((-123.3362926345, 12.1154959066), (-125.3579809313, 14.2794184599), (-125.8294714942, 17.2030259978))
            ThreePointArc((-125.8294714942, 17.2030259978), (-126.0504230147, 15.5013179384), (-126.2483618347, 13.7967798433))
            Line((-126.2483618347, 13.7967798433), (-123.3362926345, 12.1154959066))
        make_face()
        with BuildLine():
            ThreePointArc((-117.5730318577, 48.0164782111), (-115.7029052836, 50.3126513281), (-112.8701105834, 51.1758190826))
            Line((-112.8701105834, 51.1758190826), (-116.2326784567, 51.1758190826))
            ThreePointArc((-116.2326784567, 51.1758190826), (-116.9135274576, 49.6006763806), (-117.5730318577, 48.0164782111))
        make_face()
        with BuildLine():
            ThreePointArc((-100.7546146767, 72.1604735518), (-101.4234868237, 75.0453296032), (-100.3700058599, 77.8129932832))
            ThreePointArc((-100.3700058599, 77.8129932832), (-101.4122095193, 76.4497466341), (-102.4358986134, 75.0725427521))
            Line((-102.4358986134, 75.0725427521), (-100.7546146767, 72.1604735518))
        make_face()
        with BuildLine():
            ThreePointArc((-77.8129932832, 100.3700058599), (-75.0453296032, 101.4234868237), (-72.1604735518, 100.7546146767))
            Line((-72.1604735518, 100.7546146767), (-75.0725427521, 102.4358986134))
            ThreePointArc((-75.0725427521, 102.4358986134), (-76.4497466341, 101.4122095193), (-77.8129932832, 100.3700058599))
        make_face()
        with BuildLine():
            ThreePointArc((-51.1758190826, 112.8701105834), (-50.3126513281, 115.7029052836), (-48.0164782111, 117.5730318577))
            ThreePointArc((-48.0164782111, 117.5730318577), (-49.6006763806, 116.9135274576), (-51.1758190826, 116.2326784567))
            Line((-51.1758190826, 116.2326784567), (-51.1758190826, 112.8701105834))
        make_face()
    extrude(amount=F4_T3_DEPTH, mode=Mode.SUBTRACT)


solid = f1.part
